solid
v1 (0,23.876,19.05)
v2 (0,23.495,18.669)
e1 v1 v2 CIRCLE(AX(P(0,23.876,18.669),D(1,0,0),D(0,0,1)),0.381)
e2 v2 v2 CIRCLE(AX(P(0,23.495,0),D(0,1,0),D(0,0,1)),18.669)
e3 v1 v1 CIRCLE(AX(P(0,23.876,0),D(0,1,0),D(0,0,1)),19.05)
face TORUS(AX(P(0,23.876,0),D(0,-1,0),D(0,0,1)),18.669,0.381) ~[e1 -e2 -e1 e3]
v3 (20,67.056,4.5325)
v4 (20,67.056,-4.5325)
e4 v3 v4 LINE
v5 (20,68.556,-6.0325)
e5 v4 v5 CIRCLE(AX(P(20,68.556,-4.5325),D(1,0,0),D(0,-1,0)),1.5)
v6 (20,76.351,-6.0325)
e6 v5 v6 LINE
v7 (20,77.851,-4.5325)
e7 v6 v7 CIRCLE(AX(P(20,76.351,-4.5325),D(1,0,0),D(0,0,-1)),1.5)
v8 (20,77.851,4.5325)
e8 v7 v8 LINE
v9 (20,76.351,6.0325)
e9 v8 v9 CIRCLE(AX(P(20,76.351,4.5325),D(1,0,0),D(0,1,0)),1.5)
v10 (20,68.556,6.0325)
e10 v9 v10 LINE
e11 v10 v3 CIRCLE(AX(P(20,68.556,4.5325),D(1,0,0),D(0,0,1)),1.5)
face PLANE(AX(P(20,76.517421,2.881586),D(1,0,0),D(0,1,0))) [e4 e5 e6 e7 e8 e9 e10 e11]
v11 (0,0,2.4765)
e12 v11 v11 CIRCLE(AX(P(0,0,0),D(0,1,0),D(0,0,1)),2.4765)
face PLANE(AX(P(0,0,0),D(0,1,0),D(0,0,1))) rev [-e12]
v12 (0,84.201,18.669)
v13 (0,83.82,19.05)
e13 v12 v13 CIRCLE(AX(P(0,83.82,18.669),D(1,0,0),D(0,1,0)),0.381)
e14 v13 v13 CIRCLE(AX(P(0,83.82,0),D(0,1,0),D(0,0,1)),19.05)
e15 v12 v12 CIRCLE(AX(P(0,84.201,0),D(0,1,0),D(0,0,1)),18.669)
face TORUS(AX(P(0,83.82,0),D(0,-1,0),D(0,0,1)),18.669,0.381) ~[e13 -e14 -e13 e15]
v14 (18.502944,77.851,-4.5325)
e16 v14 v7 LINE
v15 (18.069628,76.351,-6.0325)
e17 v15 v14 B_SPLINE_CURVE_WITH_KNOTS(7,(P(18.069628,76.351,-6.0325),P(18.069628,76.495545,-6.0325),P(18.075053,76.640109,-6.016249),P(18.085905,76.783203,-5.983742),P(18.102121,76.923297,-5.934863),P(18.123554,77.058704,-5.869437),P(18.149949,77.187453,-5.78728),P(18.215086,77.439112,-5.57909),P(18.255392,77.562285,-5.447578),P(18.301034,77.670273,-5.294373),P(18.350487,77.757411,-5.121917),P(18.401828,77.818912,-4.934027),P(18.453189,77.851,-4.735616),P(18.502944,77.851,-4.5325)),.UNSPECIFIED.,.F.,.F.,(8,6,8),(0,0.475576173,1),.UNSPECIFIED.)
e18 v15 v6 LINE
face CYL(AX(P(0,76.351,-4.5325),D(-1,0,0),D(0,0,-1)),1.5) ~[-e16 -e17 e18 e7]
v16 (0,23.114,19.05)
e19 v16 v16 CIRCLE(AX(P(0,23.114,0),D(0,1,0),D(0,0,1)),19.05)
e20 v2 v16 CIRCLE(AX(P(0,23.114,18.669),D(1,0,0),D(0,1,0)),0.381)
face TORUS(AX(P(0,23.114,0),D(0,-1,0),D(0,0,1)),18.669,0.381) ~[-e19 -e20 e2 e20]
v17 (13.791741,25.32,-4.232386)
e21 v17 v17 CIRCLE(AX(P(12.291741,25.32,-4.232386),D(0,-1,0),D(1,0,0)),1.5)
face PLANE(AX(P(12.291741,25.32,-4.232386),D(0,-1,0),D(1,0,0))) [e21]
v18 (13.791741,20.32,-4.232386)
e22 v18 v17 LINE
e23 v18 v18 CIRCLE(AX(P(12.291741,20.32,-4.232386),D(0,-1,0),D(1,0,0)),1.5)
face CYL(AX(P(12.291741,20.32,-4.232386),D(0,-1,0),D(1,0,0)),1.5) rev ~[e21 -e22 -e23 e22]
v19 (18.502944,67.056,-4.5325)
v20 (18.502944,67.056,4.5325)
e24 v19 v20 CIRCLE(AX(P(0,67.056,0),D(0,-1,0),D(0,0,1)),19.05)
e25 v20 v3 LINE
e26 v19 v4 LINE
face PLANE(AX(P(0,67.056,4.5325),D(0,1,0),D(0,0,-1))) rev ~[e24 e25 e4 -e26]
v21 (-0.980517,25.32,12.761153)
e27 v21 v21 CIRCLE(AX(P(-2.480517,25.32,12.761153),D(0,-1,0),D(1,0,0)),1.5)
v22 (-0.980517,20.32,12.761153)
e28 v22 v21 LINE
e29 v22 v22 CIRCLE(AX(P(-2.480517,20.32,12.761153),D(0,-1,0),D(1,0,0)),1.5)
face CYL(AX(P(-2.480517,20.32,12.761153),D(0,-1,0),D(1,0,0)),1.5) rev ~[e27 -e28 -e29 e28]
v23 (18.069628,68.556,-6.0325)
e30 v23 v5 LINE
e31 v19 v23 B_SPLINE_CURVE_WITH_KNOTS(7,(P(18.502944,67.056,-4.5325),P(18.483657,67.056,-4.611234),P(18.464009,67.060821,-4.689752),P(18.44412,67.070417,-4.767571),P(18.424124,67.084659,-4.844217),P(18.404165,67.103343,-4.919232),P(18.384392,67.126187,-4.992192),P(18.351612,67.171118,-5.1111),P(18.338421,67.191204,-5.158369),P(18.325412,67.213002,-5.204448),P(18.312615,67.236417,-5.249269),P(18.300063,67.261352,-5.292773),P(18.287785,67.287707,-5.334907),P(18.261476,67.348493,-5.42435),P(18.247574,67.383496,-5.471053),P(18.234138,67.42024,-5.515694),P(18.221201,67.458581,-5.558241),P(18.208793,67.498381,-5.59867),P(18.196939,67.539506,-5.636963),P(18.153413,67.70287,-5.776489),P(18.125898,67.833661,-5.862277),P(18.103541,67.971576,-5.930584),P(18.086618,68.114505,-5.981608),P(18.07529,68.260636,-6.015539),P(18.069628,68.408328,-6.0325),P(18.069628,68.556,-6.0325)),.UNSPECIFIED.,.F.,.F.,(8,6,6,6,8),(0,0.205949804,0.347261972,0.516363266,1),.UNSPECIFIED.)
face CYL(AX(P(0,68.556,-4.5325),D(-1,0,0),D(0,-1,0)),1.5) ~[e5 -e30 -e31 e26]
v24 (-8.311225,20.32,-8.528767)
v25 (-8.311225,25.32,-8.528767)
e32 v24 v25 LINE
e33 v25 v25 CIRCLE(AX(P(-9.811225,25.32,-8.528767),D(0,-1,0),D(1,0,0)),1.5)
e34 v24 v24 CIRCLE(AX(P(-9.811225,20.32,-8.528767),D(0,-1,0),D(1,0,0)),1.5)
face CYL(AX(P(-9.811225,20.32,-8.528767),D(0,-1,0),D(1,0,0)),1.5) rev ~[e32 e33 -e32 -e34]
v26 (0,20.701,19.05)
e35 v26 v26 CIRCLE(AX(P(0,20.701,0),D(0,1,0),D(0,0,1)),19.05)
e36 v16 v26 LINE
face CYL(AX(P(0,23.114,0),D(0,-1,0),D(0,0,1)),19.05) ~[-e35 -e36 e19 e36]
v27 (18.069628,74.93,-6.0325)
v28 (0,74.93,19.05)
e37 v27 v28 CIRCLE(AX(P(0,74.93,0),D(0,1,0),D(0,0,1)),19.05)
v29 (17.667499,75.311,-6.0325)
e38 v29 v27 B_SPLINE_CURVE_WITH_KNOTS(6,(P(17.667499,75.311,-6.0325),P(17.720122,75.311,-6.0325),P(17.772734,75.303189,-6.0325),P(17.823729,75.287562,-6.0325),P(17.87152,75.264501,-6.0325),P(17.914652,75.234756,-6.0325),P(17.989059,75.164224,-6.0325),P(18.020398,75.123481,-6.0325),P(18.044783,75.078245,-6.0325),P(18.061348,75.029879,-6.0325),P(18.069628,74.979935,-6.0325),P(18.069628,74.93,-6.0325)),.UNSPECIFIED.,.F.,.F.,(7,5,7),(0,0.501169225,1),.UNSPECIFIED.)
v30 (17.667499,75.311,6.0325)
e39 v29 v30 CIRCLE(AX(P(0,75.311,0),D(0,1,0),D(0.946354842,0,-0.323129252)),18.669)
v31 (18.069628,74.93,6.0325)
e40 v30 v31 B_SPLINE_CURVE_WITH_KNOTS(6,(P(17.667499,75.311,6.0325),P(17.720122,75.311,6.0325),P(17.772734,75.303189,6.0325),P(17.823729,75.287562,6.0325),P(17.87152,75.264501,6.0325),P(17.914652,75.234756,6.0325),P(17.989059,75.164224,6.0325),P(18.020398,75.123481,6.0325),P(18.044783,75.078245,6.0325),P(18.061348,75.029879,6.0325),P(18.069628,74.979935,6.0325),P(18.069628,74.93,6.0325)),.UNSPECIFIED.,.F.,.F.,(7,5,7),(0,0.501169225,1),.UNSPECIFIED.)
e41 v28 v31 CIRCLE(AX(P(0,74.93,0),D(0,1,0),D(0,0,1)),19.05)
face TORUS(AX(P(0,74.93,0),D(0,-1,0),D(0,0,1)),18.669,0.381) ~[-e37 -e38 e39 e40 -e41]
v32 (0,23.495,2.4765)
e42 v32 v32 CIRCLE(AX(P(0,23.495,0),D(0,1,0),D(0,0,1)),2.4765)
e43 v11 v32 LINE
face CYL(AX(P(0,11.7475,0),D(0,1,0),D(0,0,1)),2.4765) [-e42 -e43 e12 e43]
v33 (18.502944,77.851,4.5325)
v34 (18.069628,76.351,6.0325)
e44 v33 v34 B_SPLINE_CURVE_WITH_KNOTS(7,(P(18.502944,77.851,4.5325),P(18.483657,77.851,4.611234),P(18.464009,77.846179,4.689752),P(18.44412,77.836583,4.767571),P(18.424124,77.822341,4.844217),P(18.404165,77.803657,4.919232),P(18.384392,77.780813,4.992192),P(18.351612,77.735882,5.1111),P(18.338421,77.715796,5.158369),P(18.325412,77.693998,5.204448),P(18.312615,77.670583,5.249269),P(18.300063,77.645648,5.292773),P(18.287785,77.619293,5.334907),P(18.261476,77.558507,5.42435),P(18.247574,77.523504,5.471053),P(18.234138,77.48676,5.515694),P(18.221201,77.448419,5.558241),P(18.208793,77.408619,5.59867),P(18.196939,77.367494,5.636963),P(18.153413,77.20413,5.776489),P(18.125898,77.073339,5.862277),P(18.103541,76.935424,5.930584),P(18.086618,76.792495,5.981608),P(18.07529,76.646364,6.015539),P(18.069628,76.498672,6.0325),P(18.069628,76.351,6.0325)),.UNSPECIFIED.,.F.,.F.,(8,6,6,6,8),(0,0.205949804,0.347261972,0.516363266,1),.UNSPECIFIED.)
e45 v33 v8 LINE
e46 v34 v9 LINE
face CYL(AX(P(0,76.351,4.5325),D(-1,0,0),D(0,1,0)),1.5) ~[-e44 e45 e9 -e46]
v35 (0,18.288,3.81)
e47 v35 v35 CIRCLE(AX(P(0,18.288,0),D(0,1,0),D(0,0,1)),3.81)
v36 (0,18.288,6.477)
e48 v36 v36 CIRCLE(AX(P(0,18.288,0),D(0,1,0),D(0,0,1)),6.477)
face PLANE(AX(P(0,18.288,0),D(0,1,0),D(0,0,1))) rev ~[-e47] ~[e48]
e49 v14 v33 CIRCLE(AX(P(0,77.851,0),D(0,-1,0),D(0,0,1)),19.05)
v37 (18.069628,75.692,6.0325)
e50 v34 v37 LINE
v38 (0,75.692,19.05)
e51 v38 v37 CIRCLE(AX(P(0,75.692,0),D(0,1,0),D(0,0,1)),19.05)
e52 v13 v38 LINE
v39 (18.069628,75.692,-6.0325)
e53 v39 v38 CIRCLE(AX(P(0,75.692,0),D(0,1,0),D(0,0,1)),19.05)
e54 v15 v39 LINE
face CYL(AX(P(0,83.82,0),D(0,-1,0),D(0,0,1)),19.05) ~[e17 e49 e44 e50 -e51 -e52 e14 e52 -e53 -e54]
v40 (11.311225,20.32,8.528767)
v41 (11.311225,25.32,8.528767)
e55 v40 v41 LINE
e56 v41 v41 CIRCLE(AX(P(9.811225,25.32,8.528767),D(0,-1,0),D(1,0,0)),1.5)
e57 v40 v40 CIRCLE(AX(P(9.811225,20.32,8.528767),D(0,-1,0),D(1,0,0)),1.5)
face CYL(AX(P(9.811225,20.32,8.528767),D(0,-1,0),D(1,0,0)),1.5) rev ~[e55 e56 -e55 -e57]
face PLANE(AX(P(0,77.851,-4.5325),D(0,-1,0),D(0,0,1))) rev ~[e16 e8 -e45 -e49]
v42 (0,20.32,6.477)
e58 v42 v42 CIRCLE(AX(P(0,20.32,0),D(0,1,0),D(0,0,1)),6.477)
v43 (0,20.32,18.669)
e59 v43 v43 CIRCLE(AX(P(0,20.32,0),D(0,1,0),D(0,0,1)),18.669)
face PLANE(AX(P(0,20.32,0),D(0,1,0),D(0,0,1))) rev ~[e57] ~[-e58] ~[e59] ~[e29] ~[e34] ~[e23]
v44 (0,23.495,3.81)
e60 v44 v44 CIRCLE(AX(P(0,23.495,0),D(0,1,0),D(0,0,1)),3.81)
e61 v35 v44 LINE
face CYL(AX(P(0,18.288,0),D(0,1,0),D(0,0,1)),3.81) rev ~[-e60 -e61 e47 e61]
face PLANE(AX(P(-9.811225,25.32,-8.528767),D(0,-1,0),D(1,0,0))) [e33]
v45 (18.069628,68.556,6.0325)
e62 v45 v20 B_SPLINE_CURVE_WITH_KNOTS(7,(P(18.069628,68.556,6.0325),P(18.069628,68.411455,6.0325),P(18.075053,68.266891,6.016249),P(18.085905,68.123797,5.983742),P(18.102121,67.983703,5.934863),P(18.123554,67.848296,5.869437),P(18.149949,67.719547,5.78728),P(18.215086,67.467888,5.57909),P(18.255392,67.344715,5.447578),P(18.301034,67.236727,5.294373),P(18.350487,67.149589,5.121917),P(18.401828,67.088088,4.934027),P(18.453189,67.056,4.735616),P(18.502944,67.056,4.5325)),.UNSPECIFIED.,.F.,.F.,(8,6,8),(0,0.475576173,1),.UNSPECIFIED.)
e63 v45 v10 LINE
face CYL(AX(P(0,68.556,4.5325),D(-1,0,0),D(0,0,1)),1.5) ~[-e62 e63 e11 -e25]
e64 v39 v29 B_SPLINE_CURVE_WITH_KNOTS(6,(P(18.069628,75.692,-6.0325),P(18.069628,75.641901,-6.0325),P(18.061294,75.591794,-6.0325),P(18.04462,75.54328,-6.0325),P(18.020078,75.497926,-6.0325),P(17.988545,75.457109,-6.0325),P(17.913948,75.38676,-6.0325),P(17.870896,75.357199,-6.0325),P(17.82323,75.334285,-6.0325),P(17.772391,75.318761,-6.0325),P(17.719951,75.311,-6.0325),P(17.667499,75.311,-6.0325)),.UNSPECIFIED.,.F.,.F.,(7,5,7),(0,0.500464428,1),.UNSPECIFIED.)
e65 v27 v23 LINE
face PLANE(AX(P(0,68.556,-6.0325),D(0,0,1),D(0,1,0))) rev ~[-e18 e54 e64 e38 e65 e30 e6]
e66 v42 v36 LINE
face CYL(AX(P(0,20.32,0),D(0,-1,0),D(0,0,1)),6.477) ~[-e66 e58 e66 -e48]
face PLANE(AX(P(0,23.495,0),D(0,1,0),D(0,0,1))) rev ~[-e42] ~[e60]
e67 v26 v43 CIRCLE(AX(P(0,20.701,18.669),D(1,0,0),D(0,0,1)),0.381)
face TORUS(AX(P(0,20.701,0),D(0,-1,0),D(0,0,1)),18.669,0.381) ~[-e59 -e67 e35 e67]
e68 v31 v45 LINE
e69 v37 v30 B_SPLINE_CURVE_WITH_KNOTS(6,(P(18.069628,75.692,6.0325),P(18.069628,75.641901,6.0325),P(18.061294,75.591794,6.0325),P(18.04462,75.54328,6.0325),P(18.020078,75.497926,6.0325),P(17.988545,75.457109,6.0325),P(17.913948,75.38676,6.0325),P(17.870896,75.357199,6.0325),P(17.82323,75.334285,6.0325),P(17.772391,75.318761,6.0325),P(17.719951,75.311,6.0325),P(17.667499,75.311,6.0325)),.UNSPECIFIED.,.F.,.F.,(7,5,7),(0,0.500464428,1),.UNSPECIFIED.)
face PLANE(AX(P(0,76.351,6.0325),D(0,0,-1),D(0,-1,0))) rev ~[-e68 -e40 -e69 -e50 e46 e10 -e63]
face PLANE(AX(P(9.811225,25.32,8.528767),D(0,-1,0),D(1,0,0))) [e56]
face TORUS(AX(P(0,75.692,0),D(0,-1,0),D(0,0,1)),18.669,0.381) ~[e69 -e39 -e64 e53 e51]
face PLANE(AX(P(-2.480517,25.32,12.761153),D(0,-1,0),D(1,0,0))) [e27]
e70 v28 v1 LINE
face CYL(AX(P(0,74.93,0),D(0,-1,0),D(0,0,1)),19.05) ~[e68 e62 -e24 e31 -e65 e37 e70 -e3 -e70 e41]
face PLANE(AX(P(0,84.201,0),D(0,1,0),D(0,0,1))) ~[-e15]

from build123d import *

# Parameters (mm, degrees)
F0_W     = 23.495
F0_H     = 2.4765
F2_DEPTH = 20
F3_R     = 1.5
F4_DEPTH = 5


# Not quite as in the source:
# - a feature names something its author has since deleted; it is built from what else it names


with BuildPart() as f1:
    # F0 (on Right) → F1 (revolve)
    with BuildSketch(Plane.YZ):
        with Locations((11.7475, 1.23825)):
            Rectangle(F0_W, F0_H)
        with BuildLine():
            Line((23.114, 19.05), (20.701, 19.05))
            ThreePointArc((20.701, 19.05), (20.4315923164, 18.9384076836), (20.32, 18.669))
            Line((20.32, 18.669), (20.32, 6.477))
            Line((20.32, 6.477), (18.288, 6.477))
            Line((18.288, 6.477), (18.288, 3.81))
            Line((18.288, 3.81), (23.495, 3.81))
            Line((23.495, 3.81), (23.495, 18.669))
            ThreePointArc((23.495, 18.669), (23.3834076836, 18.9384076836), (23.114, 19.05))
        make_face()
        with BuildLine():
            Line((76.351, 6.0325), (75.311, 6.0325))
            Line((75.311, 6.0325), (75.311, 0))
            Line((75.311, 0), (77.851, 0))
            Line((77.851, 0), (77.851, 4.5325))
            ThreePointArc((77.851, 4.5325), (77.4116601718, 5.5931601718), (76.351, 6.0325))
        make_face()
        with BuildLine():
            Line((67.056, 4.5325), (67.056, 0))
            Line((67.056, 0), (75.311, 0))
            Line((75.311, 0), (75.311, 6.0325))
            Line((75.311, 6.0325), (68.556, 6.0325))
            ThreePointArc((68.556, 6.0325), (67.4953398282, 5.5931601718), (67.056, 4.5325))
        make_face()
        with BuildLine():
            ThreePointArc((75.692, 19.05), (75.4225923164, 18.9384076836), (75.311, 18.669))
            Line((75.311, 18.669), (75.311, 6.0325))
            Line((75.311, 6.0325), (76.351, 6.0325))
            ThreePointArc((76.351, 6.0325), (77.4116601718, 5.5931601718), (77.851, 4.5325))
            Line((77.851, 4.5325), (77.851, 0))
            Line((77.851, 0), (84.201, 0))
            Line((84.201, 0), (84.201, 18.669))
            ThreePointArc((84.201, 18.669), (84.0894076836, 18.9384076836), (83.82, 19.05))
            Line((83.82, 19.05), (75.692, 19.05))
        make_face()
        with BuildLine():
            ThreePointArc((23.876, 19.05), (23.6065923164, 18.9384076836), (23.495, 18.669))
            Line((23.495, 18.669), (23.495, 3.81))
            Line((23.495, 3.81), (23.495, 2.4765))
            Line((23.495, 2.4765), (23.495, 0))
            Line((23.495, 0), (67.056, 0))
            Line((67.056, 0), (67.056, 4.5325))
            ThreePointArc((67.056, 4.5325), (67.4953398282, 5.5931601718), (68.556, 6.0325))
            Line((68.556, 6.0325), (75.311, 6.0325))
            Line((75.311, 6.0325), (75.311, 18.669))
            ThreePointArc((75.311, 18.669), (75.1994076836, 18.9384076836), (74.93, 19.05))
            Line((74.93, 19.05), (23.876, 19.05))
        make_face()
    revolve(axis=Axis((0, 11.7475, 0), (0, 1, 0)))

    # F0 (on Right) → F2 (join)
    with BuildSketch(Plane.YZ):
        with BuildLine():
            Line((76.351, 6.0325), (75.311, 6.0325))
            Line((75.311, 6.0325), (75.311, 0))
            Line((75.311, 0), (77.851, 0))
            Line((77.851, 0), (77.851, 4.5325))
            ThreePointArc((77.851, 4.5325), (77.4116601718, 5.5931601718), (76.351, 6.0325))
        make_face()
        with BuildLine():
            Line((75.311, 0), (67.056, 0))
            Line((67.056, 0), (67.056, -4.5325))
            ThreePointArc((67.056, -4.5325), (67.4953398282, -5.5931601718), (68.556, -6.0325))
            Line((68.556, -6.0325), (76.351, -6.0325))
            ThreePointArc((76.351, -6.0325), (77.4116601718, -5.5931601718), (77.851, -4.5325))
            Line((77.851, -4.5325), (77.851, 0))
            Line((77.851, 0), (75.311, 0))
        make_face()
        with BuildLine():
            Line((67.056, 4.5325), (67.056, 0))
            Line((67.056, 0), (75.311, 0))
            Line((75.311, 0), (75.311, 6.0325))
            Line((75.311, 6.0325), (68.556, 6.0325))
            ThreePointArc((68.556, 6.0325), (67.4953398282, 5.5931601718), (67.056, 4.5325))
        make_face()
    extrude(amount=F2_DEPTH)

    # F3 (on face) → F4 (cut)
    with BuildSketch(Plane.XZ.offset(-20.32)):
        with Locations((-9.8112245429, -8.5287673769)):
            Circle(F3_R)
        with Locations((-2.4805169399, 12.7611533848)):
            Circle(F3_R)
        with Locations((9.8112245429, 8.5287673769)):
            Circle(F3_R)
        with Locations((12.2917414828, -4.2323860079)):
            Circle(F3_R)
    extrude(amount=-F4_DEPTH, mode=Mode.SUBTRACT)


solid = f1.part
